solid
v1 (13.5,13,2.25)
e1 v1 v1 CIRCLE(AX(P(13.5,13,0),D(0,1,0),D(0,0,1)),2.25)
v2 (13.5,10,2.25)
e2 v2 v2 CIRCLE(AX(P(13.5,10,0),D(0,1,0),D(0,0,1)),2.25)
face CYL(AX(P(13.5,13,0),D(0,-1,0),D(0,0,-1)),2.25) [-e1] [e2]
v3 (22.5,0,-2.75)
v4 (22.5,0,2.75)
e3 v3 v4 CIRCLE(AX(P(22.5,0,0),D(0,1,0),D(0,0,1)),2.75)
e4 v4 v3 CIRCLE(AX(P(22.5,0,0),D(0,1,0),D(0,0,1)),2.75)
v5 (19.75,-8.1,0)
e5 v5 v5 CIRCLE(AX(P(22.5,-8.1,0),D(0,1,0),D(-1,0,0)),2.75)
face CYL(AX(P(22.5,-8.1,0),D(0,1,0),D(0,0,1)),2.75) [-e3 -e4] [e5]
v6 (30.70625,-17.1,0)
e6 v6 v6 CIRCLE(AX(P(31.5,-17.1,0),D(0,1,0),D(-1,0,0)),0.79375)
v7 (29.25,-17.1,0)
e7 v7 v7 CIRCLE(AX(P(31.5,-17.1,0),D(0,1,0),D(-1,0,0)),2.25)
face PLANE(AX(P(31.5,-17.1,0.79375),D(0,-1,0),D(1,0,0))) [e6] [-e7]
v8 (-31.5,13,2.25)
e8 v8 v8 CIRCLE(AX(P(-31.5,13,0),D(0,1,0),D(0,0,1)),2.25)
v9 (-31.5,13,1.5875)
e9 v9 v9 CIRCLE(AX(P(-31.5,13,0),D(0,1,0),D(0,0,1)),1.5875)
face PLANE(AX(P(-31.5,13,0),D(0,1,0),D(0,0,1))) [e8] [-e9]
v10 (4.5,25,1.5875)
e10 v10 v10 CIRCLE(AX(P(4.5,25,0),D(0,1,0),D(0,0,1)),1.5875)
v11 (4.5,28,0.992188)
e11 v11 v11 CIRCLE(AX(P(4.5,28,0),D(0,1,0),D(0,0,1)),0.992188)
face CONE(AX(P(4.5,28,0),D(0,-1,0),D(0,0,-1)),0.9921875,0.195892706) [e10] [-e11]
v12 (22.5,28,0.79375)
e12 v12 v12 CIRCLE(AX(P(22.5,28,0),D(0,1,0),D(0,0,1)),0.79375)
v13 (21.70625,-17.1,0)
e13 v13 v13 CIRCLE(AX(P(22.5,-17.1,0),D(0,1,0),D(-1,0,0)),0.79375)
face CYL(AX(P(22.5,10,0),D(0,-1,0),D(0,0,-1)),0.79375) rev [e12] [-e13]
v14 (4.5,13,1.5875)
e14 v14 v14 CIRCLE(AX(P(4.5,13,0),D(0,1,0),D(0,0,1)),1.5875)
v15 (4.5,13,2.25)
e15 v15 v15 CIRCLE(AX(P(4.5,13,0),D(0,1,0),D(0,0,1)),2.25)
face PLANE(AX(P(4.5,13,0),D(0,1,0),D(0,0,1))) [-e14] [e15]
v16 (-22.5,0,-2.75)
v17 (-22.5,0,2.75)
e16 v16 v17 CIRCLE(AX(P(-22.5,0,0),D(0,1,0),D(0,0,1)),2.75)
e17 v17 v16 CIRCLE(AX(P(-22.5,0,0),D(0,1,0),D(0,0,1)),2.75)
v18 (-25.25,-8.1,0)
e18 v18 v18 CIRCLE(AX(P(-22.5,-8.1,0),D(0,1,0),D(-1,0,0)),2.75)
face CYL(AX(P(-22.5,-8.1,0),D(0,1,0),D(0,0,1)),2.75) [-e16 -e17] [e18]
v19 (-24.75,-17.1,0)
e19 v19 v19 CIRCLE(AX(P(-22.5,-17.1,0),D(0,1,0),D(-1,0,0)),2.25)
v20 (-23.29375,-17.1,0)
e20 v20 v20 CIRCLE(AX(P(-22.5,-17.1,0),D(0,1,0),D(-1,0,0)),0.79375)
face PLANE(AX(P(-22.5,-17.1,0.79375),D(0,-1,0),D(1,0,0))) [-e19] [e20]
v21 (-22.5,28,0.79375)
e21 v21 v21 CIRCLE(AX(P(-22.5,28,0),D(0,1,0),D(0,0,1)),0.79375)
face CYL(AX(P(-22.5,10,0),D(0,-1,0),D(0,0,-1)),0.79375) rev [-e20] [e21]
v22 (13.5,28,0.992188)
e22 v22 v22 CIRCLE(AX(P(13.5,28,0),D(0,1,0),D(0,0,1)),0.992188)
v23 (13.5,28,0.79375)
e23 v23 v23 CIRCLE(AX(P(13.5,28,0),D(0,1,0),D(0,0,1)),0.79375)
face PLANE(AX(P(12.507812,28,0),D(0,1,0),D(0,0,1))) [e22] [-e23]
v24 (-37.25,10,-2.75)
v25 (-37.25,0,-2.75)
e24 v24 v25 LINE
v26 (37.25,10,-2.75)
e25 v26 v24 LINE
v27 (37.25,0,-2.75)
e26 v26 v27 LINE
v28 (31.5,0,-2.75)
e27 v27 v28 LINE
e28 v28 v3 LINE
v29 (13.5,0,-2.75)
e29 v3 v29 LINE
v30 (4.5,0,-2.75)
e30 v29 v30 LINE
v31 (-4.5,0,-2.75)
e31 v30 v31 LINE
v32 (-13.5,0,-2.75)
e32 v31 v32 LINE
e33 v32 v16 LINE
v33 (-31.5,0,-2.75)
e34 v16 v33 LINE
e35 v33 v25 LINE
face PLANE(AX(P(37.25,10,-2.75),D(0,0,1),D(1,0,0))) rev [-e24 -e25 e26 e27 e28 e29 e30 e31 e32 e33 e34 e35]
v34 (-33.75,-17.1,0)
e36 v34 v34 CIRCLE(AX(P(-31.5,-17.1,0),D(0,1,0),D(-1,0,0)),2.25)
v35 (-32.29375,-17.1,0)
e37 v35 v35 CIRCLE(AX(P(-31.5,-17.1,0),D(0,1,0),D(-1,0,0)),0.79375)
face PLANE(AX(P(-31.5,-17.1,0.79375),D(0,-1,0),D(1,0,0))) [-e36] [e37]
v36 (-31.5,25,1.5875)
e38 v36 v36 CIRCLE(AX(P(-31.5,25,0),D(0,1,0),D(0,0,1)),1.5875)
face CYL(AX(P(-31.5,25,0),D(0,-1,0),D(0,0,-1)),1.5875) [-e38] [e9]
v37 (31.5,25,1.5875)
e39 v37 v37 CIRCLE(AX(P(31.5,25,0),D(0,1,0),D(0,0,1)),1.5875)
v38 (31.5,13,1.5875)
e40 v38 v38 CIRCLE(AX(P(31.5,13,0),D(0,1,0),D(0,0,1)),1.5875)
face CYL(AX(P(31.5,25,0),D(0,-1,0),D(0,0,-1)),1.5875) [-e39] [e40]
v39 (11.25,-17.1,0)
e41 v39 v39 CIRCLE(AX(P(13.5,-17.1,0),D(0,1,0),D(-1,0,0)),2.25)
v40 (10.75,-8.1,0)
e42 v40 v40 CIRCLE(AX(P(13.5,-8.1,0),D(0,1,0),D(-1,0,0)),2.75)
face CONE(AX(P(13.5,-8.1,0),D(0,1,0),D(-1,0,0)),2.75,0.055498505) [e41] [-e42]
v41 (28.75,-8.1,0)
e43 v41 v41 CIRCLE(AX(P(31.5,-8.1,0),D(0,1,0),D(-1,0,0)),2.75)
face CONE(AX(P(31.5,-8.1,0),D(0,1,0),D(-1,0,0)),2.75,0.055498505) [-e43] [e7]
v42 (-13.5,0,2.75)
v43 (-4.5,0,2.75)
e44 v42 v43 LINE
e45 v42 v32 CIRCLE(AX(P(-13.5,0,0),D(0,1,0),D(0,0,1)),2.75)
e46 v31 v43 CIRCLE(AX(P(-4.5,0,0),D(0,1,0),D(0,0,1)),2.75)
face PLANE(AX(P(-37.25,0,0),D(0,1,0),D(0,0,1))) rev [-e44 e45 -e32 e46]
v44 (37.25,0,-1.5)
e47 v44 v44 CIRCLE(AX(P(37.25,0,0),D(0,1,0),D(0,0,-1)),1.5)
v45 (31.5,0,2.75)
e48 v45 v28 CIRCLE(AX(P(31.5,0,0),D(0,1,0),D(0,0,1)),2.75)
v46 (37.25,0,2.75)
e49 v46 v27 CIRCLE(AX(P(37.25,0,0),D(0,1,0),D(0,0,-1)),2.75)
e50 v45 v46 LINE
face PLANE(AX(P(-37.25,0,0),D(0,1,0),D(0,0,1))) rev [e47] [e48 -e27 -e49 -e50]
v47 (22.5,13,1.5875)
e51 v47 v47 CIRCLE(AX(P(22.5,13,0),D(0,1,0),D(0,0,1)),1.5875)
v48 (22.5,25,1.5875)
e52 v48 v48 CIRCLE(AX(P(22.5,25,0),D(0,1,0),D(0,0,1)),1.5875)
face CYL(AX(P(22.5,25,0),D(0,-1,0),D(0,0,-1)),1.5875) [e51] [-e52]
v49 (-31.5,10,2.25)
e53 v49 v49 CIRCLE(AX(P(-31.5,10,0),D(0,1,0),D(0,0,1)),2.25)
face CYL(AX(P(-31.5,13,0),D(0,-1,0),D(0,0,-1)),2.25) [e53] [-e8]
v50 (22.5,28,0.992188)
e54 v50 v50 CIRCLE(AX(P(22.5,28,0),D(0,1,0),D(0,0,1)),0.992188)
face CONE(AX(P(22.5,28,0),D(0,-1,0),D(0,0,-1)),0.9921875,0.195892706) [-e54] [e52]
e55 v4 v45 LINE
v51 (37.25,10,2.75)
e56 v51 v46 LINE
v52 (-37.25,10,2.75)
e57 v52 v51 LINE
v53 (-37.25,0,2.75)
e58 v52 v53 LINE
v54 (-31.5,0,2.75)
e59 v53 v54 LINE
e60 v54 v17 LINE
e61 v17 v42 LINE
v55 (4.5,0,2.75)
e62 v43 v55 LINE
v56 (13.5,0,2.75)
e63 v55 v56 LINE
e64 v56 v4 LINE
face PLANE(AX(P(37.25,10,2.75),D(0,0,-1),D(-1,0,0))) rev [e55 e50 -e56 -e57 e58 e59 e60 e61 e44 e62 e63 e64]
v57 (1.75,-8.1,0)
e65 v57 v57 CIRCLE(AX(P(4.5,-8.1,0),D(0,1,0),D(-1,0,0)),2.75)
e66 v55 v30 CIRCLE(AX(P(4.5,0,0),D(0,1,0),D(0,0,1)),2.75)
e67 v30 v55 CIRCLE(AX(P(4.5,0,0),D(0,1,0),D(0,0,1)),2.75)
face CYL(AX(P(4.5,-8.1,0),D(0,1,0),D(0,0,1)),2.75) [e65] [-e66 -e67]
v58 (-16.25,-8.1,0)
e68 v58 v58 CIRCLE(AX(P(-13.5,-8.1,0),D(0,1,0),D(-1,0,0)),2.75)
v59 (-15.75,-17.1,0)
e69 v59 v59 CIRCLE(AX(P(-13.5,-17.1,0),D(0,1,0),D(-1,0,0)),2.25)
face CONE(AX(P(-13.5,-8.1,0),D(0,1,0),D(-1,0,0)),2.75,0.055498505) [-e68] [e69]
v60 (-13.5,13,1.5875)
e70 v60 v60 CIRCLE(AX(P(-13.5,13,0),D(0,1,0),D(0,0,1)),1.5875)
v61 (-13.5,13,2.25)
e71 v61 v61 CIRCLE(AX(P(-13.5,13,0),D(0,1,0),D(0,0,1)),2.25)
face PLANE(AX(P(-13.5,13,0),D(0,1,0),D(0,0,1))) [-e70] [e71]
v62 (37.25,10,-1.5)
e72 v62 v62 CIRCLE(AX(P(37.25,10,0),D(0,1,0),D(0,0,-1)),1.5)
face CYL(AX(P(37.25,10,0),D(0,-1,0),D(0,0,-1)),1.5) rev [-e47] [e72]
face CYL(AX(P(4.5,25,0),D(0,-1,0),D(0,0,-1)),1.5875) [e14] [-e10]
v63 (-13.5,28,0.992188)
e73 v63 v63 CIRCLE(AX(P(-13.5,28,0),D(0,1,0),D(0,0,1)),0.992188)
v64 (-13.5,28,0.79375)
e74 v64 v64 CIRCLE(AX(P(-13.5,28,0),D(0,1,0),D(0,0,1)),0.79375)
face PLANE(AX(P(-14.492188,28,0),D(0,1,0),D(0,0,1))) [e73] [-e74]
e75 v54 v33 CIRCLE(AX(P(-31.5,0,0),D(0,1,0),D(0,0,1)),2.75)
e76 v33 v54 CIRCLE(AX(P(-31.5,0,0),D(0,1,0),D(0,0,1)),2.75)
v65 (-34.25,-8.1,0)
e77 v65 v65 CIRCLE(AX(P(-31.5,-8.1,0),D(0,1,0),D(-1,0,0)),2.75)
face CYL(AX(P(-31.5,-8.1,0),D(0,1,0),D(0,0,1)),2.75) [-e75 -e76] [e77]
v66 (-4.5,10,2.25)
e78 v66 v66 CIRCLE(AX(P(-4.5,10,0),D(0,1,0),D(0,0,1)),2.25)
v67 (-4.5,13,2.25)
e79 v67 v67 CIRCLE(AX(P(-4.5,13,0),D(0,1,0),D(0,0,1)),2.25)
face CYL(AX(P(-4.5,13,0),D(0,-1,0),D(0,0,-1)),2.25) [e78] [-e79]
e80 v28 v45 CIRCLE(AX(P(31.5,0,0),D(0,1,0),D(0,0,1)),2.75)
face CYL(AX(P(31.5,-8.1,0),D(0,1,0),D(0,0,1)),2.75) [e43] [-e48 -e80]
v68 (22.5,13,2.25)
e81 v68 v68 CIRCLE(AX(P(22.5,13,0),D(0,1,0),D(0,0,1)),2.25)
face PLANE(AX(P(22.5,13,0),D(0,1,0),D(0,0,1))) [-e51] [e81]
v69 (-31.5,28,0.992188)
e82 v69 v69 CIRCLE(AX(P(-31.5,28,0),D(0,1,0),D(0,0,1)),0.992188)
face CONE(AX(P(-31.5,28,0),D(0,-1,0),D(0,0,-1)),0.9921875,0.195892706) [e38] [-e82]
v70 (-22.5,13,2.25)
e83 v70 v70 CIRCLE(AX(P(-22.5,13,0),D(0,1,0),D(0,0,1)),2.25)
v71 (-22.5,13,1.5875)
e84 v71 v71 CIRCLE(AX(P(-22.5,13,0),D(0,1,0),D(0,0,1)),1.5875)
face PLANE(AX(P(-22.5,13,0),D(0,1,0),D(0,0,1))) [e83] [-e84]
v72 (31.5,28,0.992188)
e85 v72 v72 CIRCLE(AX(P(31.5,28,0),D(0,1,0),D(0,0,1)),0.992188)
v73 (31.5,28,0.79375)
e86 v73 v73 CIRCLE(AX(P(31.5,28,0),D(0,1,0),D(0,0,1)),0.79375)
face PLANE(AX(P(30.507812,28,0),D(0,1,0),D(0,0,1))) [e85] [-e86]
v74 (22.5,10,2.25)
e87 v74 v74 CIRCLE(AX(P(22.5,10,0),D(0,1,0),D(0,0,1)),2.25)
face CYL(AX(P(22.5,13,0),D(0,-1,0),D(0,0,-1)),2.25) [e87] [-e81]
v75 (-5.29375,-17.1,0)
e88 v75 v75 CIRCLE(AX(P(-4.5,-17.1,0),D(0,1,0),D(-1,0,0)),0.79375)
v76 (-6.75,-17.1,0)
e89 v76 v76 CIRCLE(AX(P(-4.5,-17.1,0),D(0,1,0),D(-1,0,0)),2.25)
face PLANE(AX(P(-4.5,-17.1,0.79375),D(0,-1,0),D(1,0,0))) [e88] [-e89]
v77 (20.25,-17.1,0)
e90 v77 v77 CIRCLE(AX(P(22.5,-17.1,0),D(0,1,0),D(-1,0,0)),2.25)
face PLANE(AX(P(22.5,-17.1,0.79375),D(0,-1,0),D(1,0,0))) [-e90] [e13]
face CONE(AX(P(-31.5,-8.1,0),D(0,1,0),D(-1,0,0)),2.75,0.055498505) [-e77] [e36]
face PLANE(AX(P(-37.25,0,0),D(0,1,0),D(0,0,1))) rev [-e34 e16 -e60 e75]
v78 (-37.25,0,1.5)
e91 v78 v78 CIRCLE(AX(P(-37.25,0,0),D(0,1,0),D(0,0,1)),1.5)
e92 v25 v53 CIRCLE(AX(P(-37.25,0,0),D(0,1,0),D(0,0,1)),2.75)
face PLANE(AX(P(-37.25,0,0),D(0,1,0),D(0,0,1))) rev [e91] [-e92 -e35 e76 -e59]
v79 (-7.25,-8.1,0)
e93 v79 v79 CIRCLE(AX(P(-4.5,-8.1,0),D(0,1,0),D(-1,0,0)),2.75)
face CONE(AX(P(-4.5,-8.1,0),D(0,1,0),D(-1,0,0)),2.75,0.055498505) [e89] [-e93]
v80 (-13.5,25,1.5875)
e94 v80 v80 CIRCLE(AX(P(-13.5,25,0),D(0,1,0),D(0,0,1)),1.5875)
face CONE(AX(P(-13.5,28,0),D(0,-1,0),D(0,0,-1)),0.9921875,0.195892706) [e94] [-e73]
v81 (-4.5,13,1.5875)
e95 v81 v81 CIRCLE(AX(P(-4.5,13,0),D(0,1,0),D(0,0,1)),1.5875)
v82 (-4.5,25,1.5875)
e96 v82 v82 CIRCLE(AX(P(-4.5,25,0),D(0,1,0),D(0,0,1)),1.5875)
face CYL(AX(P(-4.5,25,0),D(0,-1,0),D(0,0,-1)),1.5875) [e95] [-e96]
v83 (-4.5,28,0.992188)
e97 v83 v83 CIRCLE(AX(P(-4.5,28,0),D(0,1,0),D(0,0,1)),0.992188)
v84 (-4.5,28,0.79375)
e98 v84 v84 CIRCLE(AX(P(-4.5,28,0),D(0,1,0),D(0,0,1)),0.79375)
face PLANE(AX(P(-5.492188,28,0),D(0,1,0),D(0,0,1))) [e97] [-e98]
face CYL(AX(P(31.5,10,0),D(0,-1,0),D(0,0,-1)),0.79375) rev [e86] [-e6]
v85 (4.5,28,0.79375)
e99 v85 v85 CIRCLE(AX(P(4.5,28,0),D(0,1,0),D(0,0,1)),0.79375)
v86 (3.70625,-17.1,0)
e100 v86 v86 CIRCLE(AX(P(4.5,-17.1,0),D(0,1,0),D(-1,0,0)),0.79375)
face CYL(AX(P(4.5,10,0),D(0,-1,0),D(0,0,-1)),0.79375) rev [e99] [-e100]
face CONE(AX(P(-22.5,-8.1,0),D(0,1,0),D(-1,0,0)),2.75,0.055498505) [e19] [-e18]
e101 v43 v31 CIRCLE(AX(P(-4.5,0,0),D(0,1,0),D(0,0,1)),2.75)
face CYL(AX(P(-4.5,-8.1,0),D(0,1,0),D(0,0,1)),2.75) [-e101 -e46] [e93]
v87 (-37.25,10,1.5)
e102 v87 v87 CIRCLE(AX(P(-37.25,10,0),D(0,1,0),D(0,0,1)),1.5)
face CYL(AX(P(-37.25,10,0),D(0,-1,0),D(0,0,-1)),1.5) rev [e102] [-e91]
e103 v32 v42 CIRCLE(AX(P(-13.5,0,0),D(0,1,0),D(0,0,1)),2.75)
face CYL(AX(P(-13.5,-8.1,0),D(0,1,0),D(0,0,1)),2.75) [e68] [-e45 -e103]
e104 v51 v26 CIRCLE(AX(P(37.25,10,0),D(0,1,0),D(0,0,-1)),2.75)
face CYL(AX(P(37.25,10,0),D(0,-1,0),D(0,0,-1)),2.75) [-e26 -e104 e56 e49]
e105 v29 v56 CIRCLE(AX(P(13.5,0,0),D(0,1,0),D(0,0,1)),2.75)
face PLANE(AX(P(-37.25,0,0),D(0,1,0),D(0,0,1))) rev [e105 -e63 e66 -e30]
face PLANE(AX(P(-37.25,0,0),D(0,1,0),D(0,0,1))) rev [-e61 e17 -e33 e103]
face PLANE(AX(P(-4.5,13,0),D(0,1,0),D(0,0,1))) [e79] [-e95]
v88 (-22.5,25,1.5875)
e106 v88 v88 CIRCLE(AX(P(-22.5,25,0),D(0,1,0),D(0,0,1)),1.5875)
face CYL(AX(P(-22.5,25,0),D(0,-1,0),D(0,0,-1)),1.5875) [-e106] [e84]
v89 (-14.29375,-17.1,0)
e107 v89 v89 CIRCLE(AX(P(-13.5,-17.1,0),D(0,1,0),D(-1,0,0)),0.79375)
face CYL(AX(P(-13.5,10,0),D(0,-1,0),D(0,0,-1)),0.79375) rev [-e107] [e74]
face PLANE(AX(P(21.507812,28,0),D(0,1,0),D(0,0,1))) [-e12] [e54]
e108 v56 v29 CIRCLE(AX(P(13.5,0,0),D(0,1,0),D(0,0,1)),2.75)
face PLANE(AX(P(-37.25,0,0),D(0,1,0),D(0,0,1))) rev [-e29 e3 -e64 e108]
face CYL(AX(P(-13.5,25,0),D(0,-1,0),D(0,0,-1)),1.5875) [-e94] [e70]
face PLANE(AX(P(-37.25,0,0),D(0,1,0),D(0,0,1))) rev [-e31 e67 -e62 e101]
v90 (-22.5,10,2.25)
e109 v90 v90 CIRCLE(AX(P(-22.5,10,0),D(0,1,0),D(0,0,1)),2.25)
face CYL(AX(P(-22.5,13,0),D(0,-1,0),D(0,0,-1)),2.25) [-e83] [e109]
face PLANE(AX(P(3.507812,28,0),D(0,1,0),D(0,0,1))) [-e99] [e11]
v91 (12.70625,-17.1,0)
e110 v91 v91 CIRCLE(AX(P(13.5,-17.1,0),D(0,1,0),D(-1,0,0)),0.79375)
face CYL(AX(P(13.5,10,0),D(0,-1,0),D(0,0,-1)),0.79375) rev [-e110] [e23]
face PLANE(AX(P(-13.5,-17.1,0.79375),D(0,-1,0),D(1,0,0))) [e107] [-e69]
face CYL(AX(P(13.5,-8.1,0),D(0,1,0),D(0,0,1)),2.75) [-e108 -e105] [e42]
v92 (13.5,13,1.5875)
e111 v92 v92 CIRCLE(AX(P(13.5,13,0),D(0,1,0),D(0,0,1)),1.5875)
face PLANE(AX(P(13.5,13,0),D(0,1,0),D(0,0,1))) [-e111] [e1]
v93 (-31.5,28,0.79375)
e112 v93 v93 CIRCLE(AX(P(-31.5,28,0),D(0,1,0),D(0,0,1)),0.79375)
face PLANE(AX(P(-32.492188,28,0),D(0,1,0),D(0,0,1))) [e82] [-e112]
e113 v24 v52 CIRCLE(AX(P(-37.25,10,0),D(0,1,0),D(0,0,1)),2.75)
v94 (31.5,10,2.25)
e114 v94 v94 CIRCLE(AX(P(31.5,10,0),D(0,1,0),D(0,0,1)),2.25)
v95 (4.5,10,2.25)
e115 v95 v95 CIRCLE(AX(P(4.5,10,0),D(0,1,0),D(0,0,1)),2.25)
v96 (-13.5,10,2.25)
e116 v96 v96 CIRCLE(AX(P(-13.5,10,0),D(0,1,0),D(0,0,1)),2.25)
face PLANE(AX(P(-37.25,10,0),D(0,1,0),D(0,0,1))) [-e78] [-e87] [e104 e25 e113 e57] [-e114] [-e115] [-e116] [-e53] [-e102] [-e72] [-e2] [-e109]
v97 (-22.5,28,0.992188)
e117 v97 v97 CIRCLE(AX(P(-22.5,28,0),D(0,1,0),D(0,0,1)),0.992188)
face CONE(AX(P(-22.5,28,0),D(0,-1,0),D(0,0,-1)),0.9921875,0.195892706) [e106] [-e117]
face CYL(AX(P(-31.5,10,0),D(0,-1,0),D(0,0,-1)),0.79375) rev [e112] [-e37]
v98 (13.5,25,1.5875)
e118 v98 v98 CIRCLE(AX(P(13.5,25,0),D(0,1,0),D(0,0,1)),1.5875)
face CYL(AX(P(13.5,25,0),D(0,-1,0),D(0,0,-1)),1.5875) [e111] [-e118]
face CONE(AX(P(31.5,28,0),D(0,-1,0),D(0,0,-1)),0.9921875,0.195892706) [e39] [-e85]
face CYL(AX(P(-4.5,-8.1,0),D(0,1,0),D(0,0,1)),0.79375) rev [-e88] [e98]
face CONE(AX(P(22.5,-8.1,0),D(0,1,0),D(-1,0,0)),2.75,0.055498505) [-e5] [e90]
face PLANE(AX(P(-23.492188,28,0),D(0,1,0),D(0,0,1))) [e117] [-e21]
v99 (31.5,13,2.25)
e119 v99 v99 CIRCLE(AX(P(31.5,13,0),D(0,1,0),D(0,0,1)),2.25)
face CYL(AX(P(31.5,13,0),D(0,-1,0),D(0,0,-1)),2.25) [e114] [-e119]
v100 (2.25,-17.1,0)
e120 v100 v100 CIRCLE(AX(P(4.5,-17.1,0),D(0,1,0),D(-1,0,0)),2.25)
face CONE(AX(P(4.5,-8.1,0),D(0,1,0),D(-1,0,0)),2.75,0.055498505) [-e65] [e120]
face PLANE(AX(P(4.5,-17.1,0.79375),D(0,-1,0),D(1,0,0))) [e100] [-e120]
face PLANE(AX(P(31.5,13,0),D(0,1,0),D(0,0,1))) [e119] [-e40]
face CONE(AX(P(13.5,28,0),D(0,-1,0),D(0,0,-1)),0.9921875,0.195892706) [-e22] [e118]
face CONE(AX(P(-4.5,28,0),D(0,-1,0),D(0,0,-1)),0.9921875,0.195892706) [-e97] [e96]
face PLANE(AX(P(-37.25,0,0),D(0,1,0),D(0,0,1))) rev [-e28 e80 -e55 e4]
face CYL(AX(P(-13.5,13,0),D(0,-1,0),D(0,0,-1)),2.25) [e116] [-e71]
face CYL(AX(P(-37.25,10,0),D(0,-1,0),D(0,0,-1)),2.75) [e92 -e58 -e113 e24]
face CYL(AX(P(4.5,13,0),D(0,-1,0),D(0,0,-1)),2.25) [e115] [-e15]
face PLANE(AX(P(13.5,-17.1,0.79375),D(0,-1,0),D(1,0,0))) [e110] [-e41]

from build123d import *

# Parameters (mm, degrees)
SKETCH1_R             = 2.75
SKETCH1_R_2           = 0.79375
BOSS_EXTRUDE1_DEPTH   = 8.1
BOSS_EXTRUDE1_2_DEPTH = 8.1
BOSS_EXTRUDE1_3_DEPTH = 8.1
BOSS_EXTRUDE1_4_DEPTH = 8.1
BOSS_EXTRUDE1_5_DEPTH = 8.1
BOSS_EXTRUDE1_6_DEPTH = 8.1
BOSS_EXTRUDE1_7_DEPTH = 8.1
BOSS_EXTRUDE1_8_DEPTH = 8.1
LPATTERN4_COUNT       = 8
LPATTERN4_PITCH       = 9
BOSS_EXTRUDE2_START   = 10
SKETCH10_R            = 0.79375
SKETCH10_R_2          = 1.5
BOSS_EXTRUDE2_DEPTH   = 10
SKETCH11_R            = 1.5875
SKETCH11_R_2          = 0.79375
BOSS_EXTRUDE3_DEPTH   = 15
BOSS_EXTRUDE3_2_DEPTH = 15
BOSS_EXTRUDE3_3_DEPTH = 15
BOSS_EXTRUDE3_4_DEPTH = 15
BOSS_EXTRUDE3_5_DEPTH = 15
BOSS_EXTRUDE3_6_DEPTH = 15
BOSS_EXTRUDE3_7_DEPTH = 15
BOSS_EXTRUDE3_8_DEPTH = 15
LPATTERN6_COUNT       = 8
LPATTERN6_PITCH       = 9
BOSS_EXTRUDE5_START   = 10
SKETCH10_2_R          = 0.79375
SKETCH10_2_R_2        = 1.5
BOSS_EXTRUDE5_DEPTH   = 10
SKETCH20_R            = 2.25
SKETCH20_R_2          = 0.79375
BOSS_EXTRUDE6_DEPTH   = 3


with BuildPart() as part:
    # Sketch1 → Boss-Extrude1 (new body)
    with BuildSketch(Plane(origin=(0, 0, 0), x_dir=(1, 0, 0), z_dir=(0, 1, 0))):
        with Locations((-4.5, 0)):
            Circle(SKETCH1_R)
        with Locations((-4.5, 0)):
            Circle(SKETCH1_R_2, mode=Mode.SUBTRACT)
    extrude(amount=-BOSS_EXTRUDE1_DEPTH)



with BuildPart() as body_2:
    # Sketch1 → Boss-Extrude1 2 (new body)
    with BuildSketch(Plane(origin=(0, 0, 0), x_dir=(1, 0, 0), z_dir=(0, 1, 0))):
        with Locations((4.5, 0)):
            Circle(SKETCH1_R)
        with Locations((4.5, 0)):
            Circle(SKETCH1_R_2, mode=Mode.SUBTRACT)
    extrude(amount=-BOSS_EXTRUDE1_2_DEPTH)


with BuildPart() as body_3:
    # Sketch1 → Boss-Extrude1 3 (new body)
    with BuildSketch(Plane(origin=(0, 0, 0), x_dir=(1, 0, 0), z_dir=(0, 1, 0))):
        with Locations((13.5, 0)):
            Circle(SKETCH1_R)
        with Locations((13.5, 0)):
            Circle(SKETCH1_R_2, mode=Mode.SUBTRACT)
    extrude(amount=-BOSS_EXTRUDE1_3_DEPTH)


with BuildPart() as body_4:
    # Sketch1 → Boss-Extrude1 4 (new body)
    with BuildSketch(Plane(origin=(0, 0, 0), x_dir=(1, 0, 0), z_dir=(0, 1, 0))):
        with Locations((22.5, 0)):
            Circle(SKETCH1_R)
        with Locations((22.5, 0)):
            Circle(SKETCH1_R_2, mode=Mode.SUBTRACT)
    extrude(amount=-BOSS_EXTRUDE1_4_DEPTH)


with BuildPart() as body_5:
    # Sketch1 → Boss-Extrude1 5 (new body)
    with BuildSketch(Plane(origin=(0, 0, 0), x_dir=(1, 0, 0), z_dir=(0, 1, 0))):
        with Locations((31.5, 0)):
            Circle(SKETCH1_R)
        with Locations((31.5, 0)):
            Circle(SKETCH1_R_2, mode=Mode.SUBTRACT)
    extrude(amount=-BOSS_EXTRUDE1_5_DEPTH)


with BuildPart() as body_6:
    # Sketch1 → Boss-Extrude1 6 (new body)
    with BuildSketch(Plane(origin=(0, 0, 0), x_dir=(1, 0, 0), z_dir=(0, 1, 0))):
        with Locations((-13.5, 0)):
            Circle(SKETCH1_R)
        with Locations((-13.5, 0)):
            Circle(SKETCH1_R_2, mode=Mode.SUBTRACT)
    extrude(amount=-BOSS_EXTRUDE1_6_DEPTH)


with BuildPart() as body_7:
    # Sketch1 → Boss-Extrude1 7 (new body)
    with BuildSketch(Plane(origin=(0, 0, 0), x_dir=(1, 0, 0), z_dir=(0, 1, 0))):
        with Locations((-22.5, 0)):
            Circle(SKETCH1_R)
        with Locations((-22.5, 0)):
            Circle(SKETCH1_R_2, mode=Mode.SUBTRACT)
    extrude(amount=-BOSS_EXTRUDE1_7_DEPTH)


with BuildPart() as body_8:
    # Sketch1 → Boss-Extrude1 8 (new body)
    with BuildSketch(Plane(origin=(0, 0, 0), x_dir=(1, 0, 0), z_dir=(0, 1, 0))):
        with Locations((-31.5, 0)):
            Circle(SKETCH1_R)
        with Locations((-31.5, 0)):
            Circle(SKETCH1_R_2, mode=Mode.SUBTRACT)
    extrude(amount=-BOSS_EXTRUDE1_8_DEPTH)


with BuildPart() as body_9:
    # Sketch9 → Revolve1 (revolve)
    with BuildSketch(Plane(origin=(-31.5, 0, 0), x_dir=(0, 0, -1), z_dir=(1, 0, 0))):
        Polygon((-0.79375, -8.1), (-0.79375, -17.1), (-2.25, -17.1), (-2.75, -8.1), align=None)
    revolve(axis=Axis((-31.5, -15.252901708, 0), (0, -1, 0)))


with BuildPart() as lpattern4_1:
    # LPattern4: pattern copy
    add(body_9.part.moved(Location(Vector(1, 0, 0) * (1 * LPATTERN4_PITCH))))


with BuildPart() as lpattern4_2:
    # LPattern4: pattern copy
    add(body_9.part.moved(Location(Vector(1, 0, 0) * (2 * LPATTERN4_PITCH))))


with BuildPart() as lpattern4_3:
    # LPattern4: pattern copy
    add(body_9.part.moved(Location(Vector(1, 0, 0) * (3 * LPATTERN4_PITCH))))


with BuildPart() as lpattern4_4:
    # LPattern4: pattern copy
    add(body_9.part.moved(Location(Vector(1, 0, 0) * (4 * LPATTERN4_PITCH))))


with BuildPart() as lpattern4_5:
    # LPattern4: pattern copy
    add(body_9.part.moved(Location(Vector(1, 0, 0) * (5 * LPATTERN4_PITCH))))


with BuildPart() as lpattern4_6:
    # LPattern4: pattern copy
    add(body_9.part.moved(Location(Vector(1, 0, 0) * (6 * LPATTERN4_PITCH))))


with BuildPart() as lpattern4_7:
    # LPattern4: pattern copy
    add(body_9.part.moved(Location(Vector(1, 0, 0) * (7 * LPATTERN4_PITCH))))


with BuildPart() as part_1:
    add(part.part)

    add(body_2.part)  # Boss-Extrude2 merges body 2

    add(body_3.part)  # Boss-Extrude2 merges body 3

    add(body_4.part)  # Boss-Extrude2 merges body 4

    add(body_5.part)  # Boss-Extrude2 merges body 5

    add(body_6.part)  # Boss-Extrude2 merges body 6

    add(body_7.part)  # Boss-Extrude2 merges body 7

    add(body_8.part)  # Boss-Extrude2 merges body 8
    # Sketch10 → Boss-Extrude2 (add)
    with BuildSketch(Plane(origin=(0, 0, 0), x_dir=(1, 0, 0), z_dir=(0, 1, 0)).offset(BOSS_EXTRUDE2_START)):
        with BuildLine():
            Line((37.25, -2.75), (-37.25, -2.75))
            ThreePointArc((-37.25, -2.75), (-40, 0), (-37.25, 2.75))
            Line((-37.25, 2.75), (37.25, 2.75))
            ThreePointArc((37.25, 2.75), (40, 0), (37.25, -2.75))
        make_face()
        with Locations((-31.5, 0)):
            Circle(SKETCH10_R, mode=Mode.SUBTRACT)
        with Locations((-22.5, 0)):
            Circle(SKETCH10_R, mode=Mode.SUBTRACT)
        with Locations((-37.25, 0)):
            Circle(SKETCH10_R_2, mode=Mode.SUBTRACT)
        with Locations((37.25, 0)):
            Circle(SKETCH10_R_2, mode=Mode.SUBTRACT)
        with Locations((-13.5, 0)):
            Circle(SKETCH10_R, mode=Mode.SUBTRACT)
        with Locations((-4.5, 0)):
            Circle(SKETCH10_R, mode=Mode.SUBTRACT)
        with Locations((4.5, 0)):
            Circle(SKETCH10_R, mode=Mode.SUBTRACT)
        with Locations((13.5, 0)):
            Circle(SKETCH10_R, mode=Mode.SUBTRACT)
        with Locations((22.5, 0)):
            Circle(SKETCH10_R, mode=Mode.SUBTRACT)
        with Locations((31.5, 0)):
            Circle(SKETCH10_R, mode=Mode.SUBTRACT)
    extrude(amount=-BOSS_EXTRUDE2_DEPTH)



with BuildPart() as body_10:
    # Sketch11 → Boss-Extrude3 (new body)
    with BuildSketch(Plane(origin=(0, 10, 0), x_dir=(1, 0, 0), z_dir=(0, 1, 0))):
        with Locations((-31.5, 0)):
            Circle(SKETCH11_R)
        with Locations((-31.5, 0)):
            Circle(SKETCH11_R_2, mode=Mode.SUBTRACT)
    extrude(amount=BOSS_EXTRUDE3_DEPTH)

    # Sketch18 → Revolve3 (revolve)
    with BuildSketch(Plane.XY):
        Polygon((-32.4921875, 28), (-32.29375, 28), (-32.29375, 25), (-33.0875, 25), align=None)
    revolve3 = revolve(axis=Axis((-31.5, 25, 0), (0, -1, 0)))


with BuildPart() as body_11:
    # Sketch11 → Boss-Extrude3 2 (new body)
    with BuildSketch(Plane(origin=(0, 10, 0), x_dir=(1, 0, 0), z_dir=(0, 1, 0))):
        with Locations((-22.5, 0)):
            Circle(SKETCH11_R)
        with Locations((-22.5, 0)):
            Circle(SKETCH11_R_2, mode=Mode.SUBTRACT)
    extrude(amount=BOSS_EXTRUDE3_2_DEPTH)



with BuildPart() as body_12:
    # Sketch11 → Boss-Extrude3 3 (new body)
    with BuildSketch(Plane(origin=(0, 10, 0), x_dir=(1, 0, 0), z_dir=(0, 1, 0))):
        with Locations((-13.5, 0)):
            Circle(SKETCH11_R)
        with Locations((-13.5, 0)):
            Circle(SKETCH11_R_2, mode=Mode.SUBTRACT)
    extrude(amount=BOSS_EXTRUDE3_3_DEPTH)


with BuildPart() as body_13:
    # Sketch11 → Boss-Extrude3 4 (new body)
    with BuildSketch(Plane(origin=(0, 10, 0), x_dir=(1, 0, 0), z_dir=(0, 1, 0))):
        with Locations((-4.5, 0)):
            Circle(SKETCH11_R)
        with Locations((-4.5, 0)):
            Circle(SKETCH11_R_2, mode=Mode.SUBTRACT)
    extrude(amount=BOSS_EXTRUDE3_4_DEPTH)


with BuildPart() as body_14:
    # Sketch11 → Boss-Extrude3 5 (new body)
    with BuildSketch(Plane(origin=(0, 10, 0), x_dir=(1, 0, 0), z_dir=(0, 1, 0))):
        with Locations((4.5, 0)):
            Circle(SKETCH11_R)
        with Locations((4.5, 0)):
            Circle(SKETCH11_R_2, mode=Mode.SUBTRACT)
    extrude(amount=BOSS_EXTRUDE3_5_DEPTH)


with BuildPart() as body_15:
    # Sketch11 → Boss-Extrude3 6 (new body)
    with BuildSketch(Plane(origin=(0, 10, 0), x_dir=(1, 0, 0), z_dir=(0, 1, 0))):
        with Locations((13.5, 0)):
            Circle(SKETCH11_R)
        with Locations((13.5, 0)):
            Circle(SKETCH11_R_2, mode=Mode.SUBTRACT)
    extrude(amount=BOSS_EXTRUDE3_6_DEPTH)


with BuildPart() as body_16:
    # Sketch11 → Boss-Extrude3 7 (new body)
    with BuildSketch(Plane(origin=(0, 10, 0), x_dir=(1, 0, 0), z_dir=(0, 1, 0))):
        with Locations((22.5, 0)):
            Circle(SKETCH11_R)
        with Locations((22.5, 0)):
            Circle(SKETCH11_R_2, mode=Mode.SUBTRACT)
    extrude(amount=BOSS_EXTRUDE3_7_DEPTH)


with BuildPart() as body_17:
    # Sketch11 → Boss-Extrude3 8 (new body)
    with BuildSketch(Plane(origin=(0, 10, 0), x_dir=(1, 0, 0), z_dir=(0, 1, 0))):
        with Locations((31.5, 0)):
            Circle(SKETCH11_R)
        with Locations((31.5, 0)):
            Circle(SKETCH11_R_2, mode=Mode.SUBTRACT)
    extrude(amount=BOSS_EXTRUDE3_8_DEPTH)


with BuildPart() as body_11_1:
    add(body_11.part)

    add(body_12.part)  # LPattern6 merges body 12

    add(body_13.part)  # LPattern6 merges body 13

    add(body_14.part)  # LPattern6 merges body 14

    add(body_15.part)  # LPattern6 merges body 15

    add(body_16.part)  # LPattern6 merges body 16

    add(body_17.part)  # LPattern6 merges body 17
    # LPattern6: Revolve3 ×8
    with Locations(*[(i * LPATTERN6_PITCH, 0, 0) for i in range(1, LPATTERN6_COUNT)]):
        add(revolve3)


with BuildPart() as part_2:
    add(part_1.part)

    add(body_10.part)  # Boss-Extrude5 merges body 10

    add(body_11_1.part)  # Boss-Extrude5 merges body 11
    # Sketch10<2> → Boss-Extrude5 (add)
    with BuildSketch(Plane(origin=(0, 0, 0), x_dir=(1, 0, 0), z_dir=(0, 1, 0)).offset(BOSS_EXTRUDE5_START)):
        with BuildLine():
            Line((-37.25, -2.75), (37.25, -2.75))
            ThreePointArc((37.25, -2.75), (40, 0), (37.25, 2.75))
            Line((37.25, 2.75), (-37.25, 2.75))
            ThreePointArc((-37.25, 2.75), (-40, 0), (-37.25, -2.75))
        make_face()
        with Locations((-31.5, 0)):
            Circle(SKETCH10_2_R, mode=Mode.SUBTRACT)
        with Locations((-22.5, 0)):
            Circle(SKETCH10_2_R, mode=Mode.SUBTRACT)
        with Locations((-13.5, 0)):
            Circle(SKETCH10_2_R, mode=Mode.SUBTRACT)
        with Locations((-4.5, 0)):
            Circle(SKETCH10_2_R, mode=Mode.SUBTRACT)
        with Locations((4.5, 0)):
            Circle(SKETCH10_2_R, mode=Mode.SUBTRACT)
        with Locations((13.5, 0)):
            Circle(SKETCH10_2_R, mode=Mode.SUBTRACT)
        with Locations((22.5, 0)):
            Circle(SKETCH10_2_R, mode=Mode.SUBTRACT)
        with Locations((31.5, 0)):
            Circle(SKETCH10_2_R, mode=Mode.SUBTRACT)
        with Locations((-37.25, 0)):
            Circle(SKETCH10_2_R_2, mode=Mode.SUBTRACT)
        with Locations((37.25, 0)):
            Circle(SKETCH10_2_R_2, mode=Mode.SUBTRACT)
    extrude(amount=-BOSS_EXTRUDE5_DEPTH)

    # Sketch20 → Boss-Extrude6 (add)
    # profile 1 of 8: a face of its own
    with BuildSketch(Plane(origin=(0, 10, 0), x_dir=(-1, 0, 0), z_dir=(0, 1, 0))):
        with Locations((-31.5, 0)):
            Circle(SKETCH20_R)
        with Locations((-31.5, 0)):
            Circle(SKETCH20_R_2, mode=Mode.SUBTRACT)
    # profile 2 of 8: a face of its own
    with BuildSketch(Plane(origin=(0, 10, 0), x_dir=(-1, 0, 0), z_dir=(0, 1, 0))):
        with Locations((-22.5, 0)):
            Circle(SKETCH20_R)
        with Locations((-22.5, 0)):
            Circle(SKETCH20_R_2, mode=Mode.SUBTRACT)
    # profile 3 of 8: a face of its own
    with BuildSketch(Plane(origin=(0, 10, 0), x_dir=(-1, 0, 0), z_dir=(0, 1, 0))):
        with Locations((-13.5, 0)):
            Circle(SKETCH20_R)
        with Locations((-13.5, 0)):
            Circle(SKETCH20_R_2, mode=Mode.SUBTRACT)
    # profile 4 of 8: a face of its own
    with BuildSketch(Plane(origin=(0, 10, 0), x_dir=(-1, 0, 0), z_dir=(0, 1, 0))):
        with Locations((-4.5, 0)):
            Circle(SKETCH20_R)
        with Locations((-4.5, 0)):
            Circle(SKETCH20_R_2, mode=Mode.SUBTRACT)
    # profile 5 of 8: a face of its own
    with BuildSketch(Plane(origin=(0, 10, 0), x_dir=(-1, 0, 0), z_dir=(0, 1, 0))):
        with Locations((4.5, 0)):
            Circle(SKETCH20_R)
        with Locations((4.5, 0)):
            Circle(SKETCH20_R_2, mode=Mode.SUBTRACT)
    # profile 6 of 8: a face of its own
    with BuildSketch(Plane(origin=(0, 10, 0), x_dir=(-1, 0, 0), z_dir=(0, 1, 0))):
        with Locations((13.5, 0)):
            Circle(SKETCH20_R)
        with Locations((13.5, 0)):
            Circle(SKETCH20_R_2, mode=Mode.SUBTRACT)
    # profile 7 of 8: a face of its own
    with BuildSketch(Plane(origin=(0, 10, 0), x_dir=(-1, 0, 0), z_dir=(0, 1, 0))):
        with Locations((22.5, 0)):
            Circle(SKETCH20_R)
        with Locations((22.5, 0)):
            Circle(SKETCH20_R_2, mode=Mode.SUBTRACT)
    # profile 8 of 8: a face of its own
    with BuildSketch(Plane(origin=(0, 10, 0), x_dir=(-1, 0, 0), z_dir=(0, 1, 0))):
        with Locations((31.5, 0)):
            Circle(SKETCH20_R)
        with Locations((31.5, 0)):
            Circle(SKETCH20_R_2, mode=Mode.SUBTRACT)
    extrude(amount=BOSS_EXTRUDE6_DEPTH)

    # Combine1: union body 9
    add(body_9.part)

    # Combine2: union LPattern4_1, LPattern4_2, LPattern4_3, LPattern4_4, LPattern4_5, LPattern4_6, LPattern4_7
    add(lpattern4_1.part)
    add(lpattern4_2.part)
    add(lpattern4_3.part)
    add(lpattern4_4.part)
    add(lpattern4_5.part)
    add(lpattern4_6.part)
    add(lpattern4_7.part)


solid = part_2.part
